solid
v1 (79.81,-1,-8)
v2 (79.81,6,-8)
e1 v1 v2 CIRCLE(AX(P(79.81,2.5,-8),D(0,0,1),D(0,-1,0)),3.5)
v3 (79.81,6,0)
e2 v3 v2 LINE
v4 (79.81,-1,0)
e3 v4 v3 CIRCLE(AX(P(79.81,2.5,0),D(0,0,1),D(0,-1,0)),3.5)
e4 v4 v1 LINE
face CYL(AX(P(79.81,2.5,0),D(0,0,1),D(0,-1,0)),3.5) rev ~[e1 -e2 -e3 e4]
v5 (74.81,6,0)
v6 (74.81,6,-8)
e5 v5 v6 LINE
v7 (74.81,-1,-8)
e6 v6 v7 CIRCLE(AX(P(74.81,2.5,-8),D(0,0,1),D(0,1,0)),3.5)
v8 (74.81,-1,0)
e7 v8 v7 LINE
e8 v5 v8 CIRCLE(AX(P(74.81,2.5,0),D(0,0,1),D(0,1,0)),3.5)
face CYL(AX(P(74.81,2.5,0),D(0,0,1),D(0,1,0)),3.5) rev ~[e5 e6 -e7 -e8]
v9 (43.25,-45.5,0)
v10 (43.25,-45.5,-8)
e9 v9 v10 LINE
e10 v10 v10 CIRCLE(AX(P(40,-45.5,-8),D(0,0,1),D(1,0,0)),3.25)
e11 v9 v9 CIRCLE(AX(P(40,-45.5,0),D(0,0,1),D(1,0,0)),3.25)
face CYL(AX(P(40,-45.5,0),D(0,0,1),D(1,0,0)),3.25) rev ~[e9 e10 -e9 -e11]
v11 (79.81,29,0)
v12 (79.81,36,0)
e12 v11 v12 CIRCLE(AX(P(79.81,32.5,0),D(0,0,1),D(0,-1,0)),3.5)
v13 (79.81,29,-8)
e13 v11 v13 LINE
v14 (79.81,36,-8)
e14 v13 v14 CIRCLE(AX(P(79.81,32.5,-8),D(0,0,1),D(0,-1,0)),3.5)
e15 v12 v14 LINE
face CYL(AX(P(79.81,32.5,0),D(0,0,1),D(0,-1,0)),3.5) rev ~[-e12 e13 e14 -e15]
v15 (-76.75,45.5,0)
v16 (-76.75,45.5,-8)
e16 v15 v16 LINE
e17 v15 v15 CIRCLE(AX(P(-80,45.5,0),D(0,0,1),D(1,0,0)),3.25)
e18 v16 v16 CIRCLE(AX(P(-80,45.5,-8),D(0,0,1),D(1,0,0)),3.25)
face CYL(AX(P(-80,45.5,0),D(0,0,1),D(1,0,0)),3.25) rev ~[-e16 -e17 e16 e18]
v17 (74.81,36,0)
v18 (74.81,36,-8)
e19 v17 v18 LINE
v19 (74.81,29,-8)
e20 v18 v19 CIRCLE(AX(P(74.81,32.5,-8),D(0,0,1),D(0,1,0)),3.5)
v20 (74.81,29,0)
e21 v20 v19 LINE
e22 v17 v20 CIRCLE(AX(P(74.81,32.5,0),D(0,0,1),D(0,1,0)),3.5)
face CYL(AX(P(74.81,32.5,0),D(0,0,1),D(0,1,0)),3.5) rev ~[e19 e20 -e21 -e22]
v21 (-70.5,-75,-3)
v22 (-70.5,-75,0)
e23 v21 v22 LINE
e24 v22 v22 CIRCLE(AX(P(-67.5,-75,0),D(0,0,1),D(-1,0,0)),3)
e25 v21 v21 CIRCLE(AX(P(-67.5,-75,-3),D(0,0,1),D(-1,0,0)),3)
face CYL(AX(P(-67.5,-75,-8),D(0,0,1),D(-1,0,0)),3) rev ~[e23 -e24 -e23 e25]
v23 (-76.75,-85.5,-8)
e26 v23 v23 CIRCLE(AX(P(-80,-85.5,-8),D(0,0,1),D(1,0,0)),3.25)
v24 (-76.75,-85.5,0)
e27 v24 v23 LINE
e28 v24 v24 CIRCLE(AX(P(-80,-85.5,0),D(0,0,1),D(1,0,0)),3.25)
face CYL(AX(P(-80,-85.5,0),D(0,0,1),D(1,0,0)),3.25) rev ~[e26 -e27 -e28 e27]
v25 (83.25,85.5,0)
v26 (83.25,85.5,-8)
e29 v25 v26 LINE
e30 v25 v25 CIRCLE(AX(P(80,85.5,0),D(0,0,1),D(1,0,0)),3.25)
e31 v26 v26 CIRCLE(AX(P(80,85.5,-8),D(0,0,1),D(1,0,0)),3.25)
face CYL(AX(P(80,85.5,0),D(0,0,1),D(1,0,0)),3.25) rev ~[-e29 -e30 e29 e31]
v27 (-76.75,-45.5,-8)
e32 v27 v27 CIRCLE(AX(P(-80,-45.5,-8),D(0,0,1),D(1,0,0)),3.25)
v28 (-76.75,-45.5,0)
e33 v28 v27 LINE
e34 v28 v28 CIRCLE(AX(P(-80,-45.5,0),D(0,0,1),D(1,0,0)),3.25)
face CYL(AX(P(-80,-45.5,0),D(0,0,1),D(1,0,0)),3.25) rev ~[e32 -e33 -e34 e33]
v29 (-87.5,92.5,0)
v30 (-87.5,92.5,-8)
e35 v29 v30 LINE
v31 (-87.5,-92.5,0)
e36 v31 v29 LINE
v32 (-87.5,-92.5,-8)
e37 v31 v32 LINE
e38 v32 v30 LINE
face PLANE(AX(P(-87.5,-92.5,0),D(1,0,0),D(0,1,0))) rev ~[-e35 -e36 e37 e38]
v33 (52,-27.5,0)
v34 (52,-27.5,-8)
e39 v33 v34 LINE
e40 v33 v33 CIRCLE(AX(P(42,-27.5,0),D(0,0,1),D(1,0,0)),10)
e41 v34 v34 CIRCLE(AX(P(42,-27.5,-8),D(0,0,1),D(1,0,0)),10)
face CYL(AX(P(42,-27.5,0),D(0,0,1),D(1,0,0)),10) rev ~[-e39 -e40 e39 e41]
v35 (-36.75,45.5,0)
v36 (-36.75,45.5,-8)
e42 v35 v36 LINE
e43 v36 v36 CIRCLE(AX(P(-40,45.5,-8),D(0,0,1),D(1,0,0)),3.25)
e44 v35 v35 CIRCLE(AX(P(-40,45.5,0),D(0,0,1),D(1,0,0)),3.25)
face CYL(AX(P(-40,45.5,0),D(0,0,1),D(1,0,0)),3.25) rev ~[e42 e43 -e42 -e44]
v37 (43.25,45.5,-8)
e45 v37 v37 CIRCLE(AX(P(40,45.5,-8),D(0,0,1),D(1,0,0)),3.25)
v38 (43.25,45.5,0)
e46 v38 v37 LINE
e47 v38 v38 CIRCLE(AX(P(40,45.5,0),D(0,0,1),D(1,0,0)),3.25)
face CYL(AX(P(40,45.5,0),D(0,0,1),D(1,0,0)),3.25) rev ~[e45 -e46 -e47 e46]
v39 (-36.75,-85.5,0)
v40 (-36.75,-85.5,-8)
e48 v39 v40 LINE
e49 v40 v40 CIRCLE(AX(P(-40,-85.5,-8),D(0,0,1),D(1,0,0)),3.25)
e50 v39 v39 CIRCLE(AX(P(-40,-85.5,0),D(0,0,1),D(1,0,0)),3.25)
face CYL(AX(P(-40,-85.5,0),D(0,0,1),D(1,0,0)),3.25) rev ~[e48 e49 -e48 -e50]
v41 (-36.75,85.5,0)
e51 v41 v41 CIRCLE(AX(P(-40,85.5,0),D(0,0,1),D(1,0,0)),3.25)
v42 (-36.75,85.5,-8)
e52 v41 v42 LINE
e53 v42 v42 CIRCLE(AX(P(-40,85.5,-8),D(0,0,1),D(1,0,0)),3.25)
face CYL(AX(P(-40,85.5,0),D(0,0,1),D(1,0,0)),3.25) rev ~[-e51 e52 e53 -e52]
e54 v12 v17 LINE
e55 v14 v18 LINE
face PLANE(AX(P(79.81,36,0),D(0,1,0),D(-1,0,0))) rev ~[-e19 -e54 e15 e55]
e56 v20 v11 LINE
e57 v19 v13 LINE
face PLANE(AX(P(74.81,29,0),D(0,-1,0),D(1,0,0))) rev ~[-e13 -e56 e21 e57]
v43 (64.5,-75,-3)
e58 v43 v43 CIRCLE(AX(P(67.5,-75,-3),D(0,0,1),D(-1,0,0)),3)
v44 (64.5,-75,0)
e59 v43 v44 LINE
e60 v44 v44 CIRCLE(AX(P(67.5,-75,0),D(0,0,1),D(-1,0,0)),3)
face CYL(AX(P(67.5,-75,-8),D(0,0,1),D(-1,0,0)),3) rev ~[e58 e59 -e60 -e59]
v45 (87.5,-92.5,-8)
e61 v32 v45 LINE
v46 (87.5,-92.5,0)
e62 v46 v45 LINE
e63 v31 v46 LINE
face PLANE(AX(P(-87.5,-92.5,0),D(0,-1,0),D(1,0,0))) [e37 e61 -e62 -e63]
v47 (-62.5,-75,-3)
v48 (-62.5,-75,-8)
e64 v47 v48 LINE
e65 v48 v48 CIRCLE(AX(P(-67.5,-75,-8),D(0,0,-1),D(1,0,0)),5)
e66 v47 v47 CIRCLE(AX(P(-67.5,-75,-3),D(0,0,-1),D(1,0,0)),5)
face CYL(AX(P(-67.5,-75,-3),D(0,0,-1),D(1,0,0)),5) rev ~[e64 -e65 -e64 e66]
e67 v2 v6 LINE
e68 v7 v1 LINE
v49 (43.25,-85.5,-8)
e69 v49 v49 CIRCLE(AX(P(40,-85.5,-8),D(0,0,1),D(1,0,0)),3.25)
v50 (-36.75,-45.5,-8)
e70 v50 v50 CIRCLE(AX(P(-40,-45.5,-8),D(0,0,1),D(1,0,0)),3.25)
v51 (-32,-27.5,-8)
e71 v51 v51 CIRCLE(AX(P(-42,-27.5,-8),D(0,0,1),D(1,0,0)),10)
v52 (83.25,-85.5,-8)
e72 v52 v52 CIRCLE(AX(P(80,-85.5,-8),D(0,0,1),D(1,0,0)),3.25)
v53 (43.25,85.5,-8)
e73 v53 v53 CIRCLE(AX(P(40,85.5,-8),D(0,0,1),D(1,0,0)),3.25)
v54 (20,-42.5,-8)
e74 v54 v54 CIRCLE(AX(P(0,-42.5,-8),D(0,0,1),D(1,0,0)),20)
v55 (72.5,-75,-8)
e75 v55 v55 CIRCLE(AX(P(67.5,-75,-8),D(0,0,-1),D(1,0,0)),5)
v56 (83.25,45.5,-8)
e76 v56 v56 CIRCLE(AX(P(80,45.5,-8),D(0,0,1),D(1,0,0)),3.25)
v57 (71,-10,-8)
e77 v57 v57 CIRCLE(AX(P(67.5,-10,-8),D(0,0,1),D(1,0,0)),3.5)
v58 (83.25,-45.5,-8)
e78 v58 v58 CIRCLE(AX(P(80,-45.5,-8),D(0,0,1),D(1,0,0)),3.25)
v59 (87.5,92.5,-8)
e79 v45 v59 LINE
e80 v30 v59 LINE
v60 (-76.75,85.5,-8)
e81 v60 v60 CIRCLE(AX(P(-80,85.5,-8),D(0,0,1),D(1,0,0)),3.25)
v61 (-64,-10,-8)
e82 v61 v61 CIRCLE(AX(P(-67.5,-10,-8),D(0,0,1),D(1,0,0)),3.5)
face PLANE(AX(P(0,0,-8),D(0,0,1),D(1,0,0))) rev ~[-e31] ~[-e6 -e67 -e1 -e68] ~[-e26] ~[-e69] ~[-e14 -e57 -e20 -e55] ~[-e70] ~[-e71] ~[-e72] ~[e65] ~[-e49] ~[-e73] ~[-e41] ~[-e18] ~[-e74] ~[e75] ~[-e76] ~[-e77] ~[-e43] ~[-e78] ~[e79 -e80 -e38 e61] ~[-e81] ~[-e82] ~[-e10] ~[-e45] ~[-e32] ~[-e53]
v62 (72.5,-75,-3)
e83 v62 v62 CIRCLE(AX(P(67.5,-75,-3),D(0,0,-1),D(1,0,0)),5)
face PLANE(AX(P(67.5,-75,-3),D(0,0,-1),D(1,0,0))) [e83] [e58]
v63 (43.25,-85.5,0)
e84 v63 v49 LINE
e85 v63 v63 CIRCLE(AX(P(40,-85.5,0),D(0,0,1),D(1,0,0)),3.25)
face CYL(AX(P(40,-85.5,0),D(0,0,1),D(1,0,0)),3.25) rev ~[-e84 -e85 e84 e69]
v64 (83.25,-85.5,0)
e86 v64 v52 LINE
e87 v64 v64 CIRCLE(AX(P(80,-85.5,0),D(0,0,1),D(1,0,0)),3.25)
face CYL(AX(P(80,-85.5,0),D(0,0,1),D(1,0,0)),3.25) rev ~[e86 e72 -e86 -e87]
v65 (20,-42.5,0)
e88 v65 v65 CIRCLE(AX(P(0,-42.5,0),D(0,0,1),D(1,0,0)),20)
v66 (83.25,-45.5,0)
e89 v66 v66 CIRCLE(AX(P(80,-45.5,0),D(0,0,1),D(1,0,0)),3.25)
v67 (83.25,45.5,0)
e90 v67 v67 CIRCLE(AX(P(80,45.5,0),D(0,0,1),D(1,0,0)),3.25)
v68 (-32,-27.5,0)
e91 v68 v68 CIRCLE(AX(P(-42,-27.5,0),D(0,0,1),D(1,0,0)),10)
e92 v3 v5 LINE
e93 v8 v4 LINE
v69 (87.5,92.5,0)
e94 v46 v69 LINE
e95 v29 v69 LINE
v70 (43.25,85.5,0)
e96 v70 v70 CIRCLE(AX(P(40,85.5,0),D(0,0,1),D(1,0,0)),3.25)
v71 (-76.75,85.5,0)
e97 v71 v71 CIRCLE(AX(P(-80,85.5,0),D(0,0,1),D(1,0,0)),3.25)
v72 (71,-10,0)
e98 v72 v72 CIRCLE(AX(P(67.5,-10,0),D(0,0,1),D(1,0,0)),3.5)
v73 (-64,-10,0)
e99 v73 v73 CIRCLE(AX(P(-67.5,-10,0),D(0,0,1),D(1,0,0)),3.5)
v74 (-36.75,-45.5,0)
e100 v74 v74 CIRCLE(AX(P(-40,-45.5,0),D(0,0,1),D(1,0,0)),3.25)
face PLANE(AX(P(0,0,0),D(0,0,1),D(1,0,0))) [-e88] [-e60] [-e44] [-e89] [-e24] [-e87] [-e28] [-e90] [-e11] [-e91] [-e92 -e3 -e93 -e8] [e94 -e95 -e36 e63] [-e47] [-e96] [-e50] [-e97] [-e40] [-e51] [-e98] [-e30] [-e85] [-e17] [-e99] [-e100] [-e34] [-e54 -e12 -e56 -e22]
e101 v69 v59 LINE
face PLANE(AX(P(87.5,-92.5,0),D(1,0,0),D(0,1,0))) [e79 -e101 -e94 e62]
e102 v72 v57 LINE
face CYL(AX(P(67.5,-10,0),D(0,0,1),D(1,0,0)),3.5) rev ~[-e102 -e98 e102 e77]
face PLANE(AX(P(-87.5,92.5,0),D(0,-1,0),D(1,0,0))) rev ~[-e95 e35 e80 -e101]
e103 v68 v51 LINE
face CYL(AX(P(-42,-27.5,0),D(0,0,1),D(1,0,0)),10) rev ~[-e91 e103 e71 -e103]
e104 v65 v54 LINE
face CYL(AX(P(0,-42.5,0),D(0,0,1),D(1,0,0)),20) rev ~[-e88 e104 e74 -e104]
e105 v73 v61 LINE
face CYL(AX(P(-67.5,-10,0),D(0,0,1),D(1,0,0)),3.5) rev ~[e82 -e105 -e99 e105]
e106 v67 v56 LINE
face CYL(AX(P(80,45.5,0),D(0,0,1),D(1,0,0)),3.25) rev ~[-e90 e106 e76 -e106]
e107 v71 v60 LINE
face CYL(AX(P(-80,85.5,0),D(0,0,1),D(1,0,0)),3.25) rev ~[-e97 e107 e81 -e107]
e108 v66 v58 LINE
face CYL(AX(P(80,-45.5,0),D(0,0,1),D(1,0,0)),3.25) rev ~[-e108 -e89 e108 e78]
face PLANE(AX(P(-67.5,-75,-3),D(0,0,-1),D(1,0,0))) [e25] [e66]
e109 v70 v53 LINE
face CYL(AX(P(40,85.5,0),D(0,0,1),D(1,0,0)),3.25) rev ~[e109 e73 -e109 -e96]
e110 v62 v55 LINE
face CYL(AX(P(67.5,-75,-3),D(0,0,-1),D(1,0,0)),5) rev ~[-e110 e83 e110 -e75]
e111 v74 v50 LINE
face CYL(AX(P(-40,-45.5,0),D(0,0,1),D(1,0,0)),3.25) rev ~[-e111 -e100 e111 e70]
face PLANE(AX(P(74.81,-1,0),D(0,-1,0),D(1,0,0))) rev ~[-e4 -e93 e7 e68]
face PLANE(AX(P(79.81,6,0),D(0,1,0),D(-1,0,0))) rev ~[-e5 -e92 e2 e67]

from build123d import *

# Parameters (mm, degrees)
F0_W           = 175
F0_H           = 185
F1_DEPTH       = 8
F2_R           = 3.25
F2_R_2         = 10
F2_R_3         = 3.5
F2_R_4         = 20
F3_DEPTH       = 25
F5_D           = 6
F5_DEPTH       = 15
F5_CBORE_D     = 10
F5_CBORE_DEPTH = 5
F5_TIP         = 1.8025818571


# Not quite as in the source:
# - a feature names something its author has since deleted; it is built from what else it names


with BuildPart() as f1:
    # F0 (on Top) → F1 (new body)
    with BuildSketch(Plane.XY):
        Rectangle(F0_W, F0_H)
    extrude(amount=-F1_DEPTH)

    # F2 (on face) → F3 (cut)
    with BuildSketch(Plane.XY):
        with Locations((-80, 85.5)):
            Circle(F2_R)
        with Locations((-40, 85.5)):
            Circle(F2_R)
        with Locations((-40, 45.5)):
            Circle(F2_R)
        with Locations((-80, 45.5)):
            Circle(F2_R)
        with Locations((40, 85.5)):
            Circle(F2_R)
        with Locations((80, 85.5)):
            Circle(F2_R)
        with Locations((40, 45.5)):
            Circle(F2_R)
        with Locations((80, 45.5)):
            Circle(F2_R)
        with BuildLine():
            Line((77.31, 29), (79.81, 29))
            ThreePointArc((79.81, 29), (83.31, 32.5), (79.81, 36))
            Line((79.81, 36), (74.81, 36))
            ThreePointArc((74.81, 36), (71.31, 32.5), (74.81, 29))
            Line((74.81, 29), (77.31, 29))
        make_face()
        with BuildLine():
            ThreePointArc((79.81, -1), (83.31, 2.5), (79.81, 6))
            Line((79.81, 6), (74.81, 6))
            ThreePointArc((74.81, 6), (71.31, 2.5), (74.81, -1))
            Line((74.81, -1), (79.81, -1))
        make_face()
        with Locations((42, -27.5)):
            Circle(F2_R_2)
        with Locations((40, -45.5)):
            Circle(F2_R)
        with Locations((80, -85.5)):
            Circle(F2_R)
        with Locations((80, -45.5)):
            Circle(F2_R)
        with Locations((40, -85.5)):
            Circle(F2_R)
        with Locations((-40, -85.5)):
            Circle(F2_R)
        with Locations((-80, -85.5)):
            Circle(F2_R)
        with Locations((-80, -45.5)):
            Circle(F2_R)
        with Locations((-40, -45.5)):
            Circle(F2_R)
        with Locations((-42, -27.5)):
            Circle(F2_R_2)
        with Locations((-67.5, -10)):
            Circle(F2_R_3)
        with Locations((0, -42.5)):
            Circle(F2_R_4)
        with Locations((67.5, -10)):
            Circle(F2_R_3)
    extrude(amount=-F3_DEPTH, mode=Mode.SUBTRACT)

    # F5
    with Locations(Plane(origin=(0, 0, -8), x_dir=(1, 0, 0), z_dir=(0, 0, -1))):
        with Locations((-67.5, 75), (67.5, 75)):
            CounterBoreHole(F5_D / 2, F5_CBORE_D / 2, F5_CBORE_DEPTH, depth=F5_DEPTH)
            with Locations((0, 0, -(F5_DEPTH + F5_TIP / 2))):  # 118° drill point
                Cone(0, F5_D / 2, F5_TIP, mode=Mode.SUBTRACT)


solid = f1.part
